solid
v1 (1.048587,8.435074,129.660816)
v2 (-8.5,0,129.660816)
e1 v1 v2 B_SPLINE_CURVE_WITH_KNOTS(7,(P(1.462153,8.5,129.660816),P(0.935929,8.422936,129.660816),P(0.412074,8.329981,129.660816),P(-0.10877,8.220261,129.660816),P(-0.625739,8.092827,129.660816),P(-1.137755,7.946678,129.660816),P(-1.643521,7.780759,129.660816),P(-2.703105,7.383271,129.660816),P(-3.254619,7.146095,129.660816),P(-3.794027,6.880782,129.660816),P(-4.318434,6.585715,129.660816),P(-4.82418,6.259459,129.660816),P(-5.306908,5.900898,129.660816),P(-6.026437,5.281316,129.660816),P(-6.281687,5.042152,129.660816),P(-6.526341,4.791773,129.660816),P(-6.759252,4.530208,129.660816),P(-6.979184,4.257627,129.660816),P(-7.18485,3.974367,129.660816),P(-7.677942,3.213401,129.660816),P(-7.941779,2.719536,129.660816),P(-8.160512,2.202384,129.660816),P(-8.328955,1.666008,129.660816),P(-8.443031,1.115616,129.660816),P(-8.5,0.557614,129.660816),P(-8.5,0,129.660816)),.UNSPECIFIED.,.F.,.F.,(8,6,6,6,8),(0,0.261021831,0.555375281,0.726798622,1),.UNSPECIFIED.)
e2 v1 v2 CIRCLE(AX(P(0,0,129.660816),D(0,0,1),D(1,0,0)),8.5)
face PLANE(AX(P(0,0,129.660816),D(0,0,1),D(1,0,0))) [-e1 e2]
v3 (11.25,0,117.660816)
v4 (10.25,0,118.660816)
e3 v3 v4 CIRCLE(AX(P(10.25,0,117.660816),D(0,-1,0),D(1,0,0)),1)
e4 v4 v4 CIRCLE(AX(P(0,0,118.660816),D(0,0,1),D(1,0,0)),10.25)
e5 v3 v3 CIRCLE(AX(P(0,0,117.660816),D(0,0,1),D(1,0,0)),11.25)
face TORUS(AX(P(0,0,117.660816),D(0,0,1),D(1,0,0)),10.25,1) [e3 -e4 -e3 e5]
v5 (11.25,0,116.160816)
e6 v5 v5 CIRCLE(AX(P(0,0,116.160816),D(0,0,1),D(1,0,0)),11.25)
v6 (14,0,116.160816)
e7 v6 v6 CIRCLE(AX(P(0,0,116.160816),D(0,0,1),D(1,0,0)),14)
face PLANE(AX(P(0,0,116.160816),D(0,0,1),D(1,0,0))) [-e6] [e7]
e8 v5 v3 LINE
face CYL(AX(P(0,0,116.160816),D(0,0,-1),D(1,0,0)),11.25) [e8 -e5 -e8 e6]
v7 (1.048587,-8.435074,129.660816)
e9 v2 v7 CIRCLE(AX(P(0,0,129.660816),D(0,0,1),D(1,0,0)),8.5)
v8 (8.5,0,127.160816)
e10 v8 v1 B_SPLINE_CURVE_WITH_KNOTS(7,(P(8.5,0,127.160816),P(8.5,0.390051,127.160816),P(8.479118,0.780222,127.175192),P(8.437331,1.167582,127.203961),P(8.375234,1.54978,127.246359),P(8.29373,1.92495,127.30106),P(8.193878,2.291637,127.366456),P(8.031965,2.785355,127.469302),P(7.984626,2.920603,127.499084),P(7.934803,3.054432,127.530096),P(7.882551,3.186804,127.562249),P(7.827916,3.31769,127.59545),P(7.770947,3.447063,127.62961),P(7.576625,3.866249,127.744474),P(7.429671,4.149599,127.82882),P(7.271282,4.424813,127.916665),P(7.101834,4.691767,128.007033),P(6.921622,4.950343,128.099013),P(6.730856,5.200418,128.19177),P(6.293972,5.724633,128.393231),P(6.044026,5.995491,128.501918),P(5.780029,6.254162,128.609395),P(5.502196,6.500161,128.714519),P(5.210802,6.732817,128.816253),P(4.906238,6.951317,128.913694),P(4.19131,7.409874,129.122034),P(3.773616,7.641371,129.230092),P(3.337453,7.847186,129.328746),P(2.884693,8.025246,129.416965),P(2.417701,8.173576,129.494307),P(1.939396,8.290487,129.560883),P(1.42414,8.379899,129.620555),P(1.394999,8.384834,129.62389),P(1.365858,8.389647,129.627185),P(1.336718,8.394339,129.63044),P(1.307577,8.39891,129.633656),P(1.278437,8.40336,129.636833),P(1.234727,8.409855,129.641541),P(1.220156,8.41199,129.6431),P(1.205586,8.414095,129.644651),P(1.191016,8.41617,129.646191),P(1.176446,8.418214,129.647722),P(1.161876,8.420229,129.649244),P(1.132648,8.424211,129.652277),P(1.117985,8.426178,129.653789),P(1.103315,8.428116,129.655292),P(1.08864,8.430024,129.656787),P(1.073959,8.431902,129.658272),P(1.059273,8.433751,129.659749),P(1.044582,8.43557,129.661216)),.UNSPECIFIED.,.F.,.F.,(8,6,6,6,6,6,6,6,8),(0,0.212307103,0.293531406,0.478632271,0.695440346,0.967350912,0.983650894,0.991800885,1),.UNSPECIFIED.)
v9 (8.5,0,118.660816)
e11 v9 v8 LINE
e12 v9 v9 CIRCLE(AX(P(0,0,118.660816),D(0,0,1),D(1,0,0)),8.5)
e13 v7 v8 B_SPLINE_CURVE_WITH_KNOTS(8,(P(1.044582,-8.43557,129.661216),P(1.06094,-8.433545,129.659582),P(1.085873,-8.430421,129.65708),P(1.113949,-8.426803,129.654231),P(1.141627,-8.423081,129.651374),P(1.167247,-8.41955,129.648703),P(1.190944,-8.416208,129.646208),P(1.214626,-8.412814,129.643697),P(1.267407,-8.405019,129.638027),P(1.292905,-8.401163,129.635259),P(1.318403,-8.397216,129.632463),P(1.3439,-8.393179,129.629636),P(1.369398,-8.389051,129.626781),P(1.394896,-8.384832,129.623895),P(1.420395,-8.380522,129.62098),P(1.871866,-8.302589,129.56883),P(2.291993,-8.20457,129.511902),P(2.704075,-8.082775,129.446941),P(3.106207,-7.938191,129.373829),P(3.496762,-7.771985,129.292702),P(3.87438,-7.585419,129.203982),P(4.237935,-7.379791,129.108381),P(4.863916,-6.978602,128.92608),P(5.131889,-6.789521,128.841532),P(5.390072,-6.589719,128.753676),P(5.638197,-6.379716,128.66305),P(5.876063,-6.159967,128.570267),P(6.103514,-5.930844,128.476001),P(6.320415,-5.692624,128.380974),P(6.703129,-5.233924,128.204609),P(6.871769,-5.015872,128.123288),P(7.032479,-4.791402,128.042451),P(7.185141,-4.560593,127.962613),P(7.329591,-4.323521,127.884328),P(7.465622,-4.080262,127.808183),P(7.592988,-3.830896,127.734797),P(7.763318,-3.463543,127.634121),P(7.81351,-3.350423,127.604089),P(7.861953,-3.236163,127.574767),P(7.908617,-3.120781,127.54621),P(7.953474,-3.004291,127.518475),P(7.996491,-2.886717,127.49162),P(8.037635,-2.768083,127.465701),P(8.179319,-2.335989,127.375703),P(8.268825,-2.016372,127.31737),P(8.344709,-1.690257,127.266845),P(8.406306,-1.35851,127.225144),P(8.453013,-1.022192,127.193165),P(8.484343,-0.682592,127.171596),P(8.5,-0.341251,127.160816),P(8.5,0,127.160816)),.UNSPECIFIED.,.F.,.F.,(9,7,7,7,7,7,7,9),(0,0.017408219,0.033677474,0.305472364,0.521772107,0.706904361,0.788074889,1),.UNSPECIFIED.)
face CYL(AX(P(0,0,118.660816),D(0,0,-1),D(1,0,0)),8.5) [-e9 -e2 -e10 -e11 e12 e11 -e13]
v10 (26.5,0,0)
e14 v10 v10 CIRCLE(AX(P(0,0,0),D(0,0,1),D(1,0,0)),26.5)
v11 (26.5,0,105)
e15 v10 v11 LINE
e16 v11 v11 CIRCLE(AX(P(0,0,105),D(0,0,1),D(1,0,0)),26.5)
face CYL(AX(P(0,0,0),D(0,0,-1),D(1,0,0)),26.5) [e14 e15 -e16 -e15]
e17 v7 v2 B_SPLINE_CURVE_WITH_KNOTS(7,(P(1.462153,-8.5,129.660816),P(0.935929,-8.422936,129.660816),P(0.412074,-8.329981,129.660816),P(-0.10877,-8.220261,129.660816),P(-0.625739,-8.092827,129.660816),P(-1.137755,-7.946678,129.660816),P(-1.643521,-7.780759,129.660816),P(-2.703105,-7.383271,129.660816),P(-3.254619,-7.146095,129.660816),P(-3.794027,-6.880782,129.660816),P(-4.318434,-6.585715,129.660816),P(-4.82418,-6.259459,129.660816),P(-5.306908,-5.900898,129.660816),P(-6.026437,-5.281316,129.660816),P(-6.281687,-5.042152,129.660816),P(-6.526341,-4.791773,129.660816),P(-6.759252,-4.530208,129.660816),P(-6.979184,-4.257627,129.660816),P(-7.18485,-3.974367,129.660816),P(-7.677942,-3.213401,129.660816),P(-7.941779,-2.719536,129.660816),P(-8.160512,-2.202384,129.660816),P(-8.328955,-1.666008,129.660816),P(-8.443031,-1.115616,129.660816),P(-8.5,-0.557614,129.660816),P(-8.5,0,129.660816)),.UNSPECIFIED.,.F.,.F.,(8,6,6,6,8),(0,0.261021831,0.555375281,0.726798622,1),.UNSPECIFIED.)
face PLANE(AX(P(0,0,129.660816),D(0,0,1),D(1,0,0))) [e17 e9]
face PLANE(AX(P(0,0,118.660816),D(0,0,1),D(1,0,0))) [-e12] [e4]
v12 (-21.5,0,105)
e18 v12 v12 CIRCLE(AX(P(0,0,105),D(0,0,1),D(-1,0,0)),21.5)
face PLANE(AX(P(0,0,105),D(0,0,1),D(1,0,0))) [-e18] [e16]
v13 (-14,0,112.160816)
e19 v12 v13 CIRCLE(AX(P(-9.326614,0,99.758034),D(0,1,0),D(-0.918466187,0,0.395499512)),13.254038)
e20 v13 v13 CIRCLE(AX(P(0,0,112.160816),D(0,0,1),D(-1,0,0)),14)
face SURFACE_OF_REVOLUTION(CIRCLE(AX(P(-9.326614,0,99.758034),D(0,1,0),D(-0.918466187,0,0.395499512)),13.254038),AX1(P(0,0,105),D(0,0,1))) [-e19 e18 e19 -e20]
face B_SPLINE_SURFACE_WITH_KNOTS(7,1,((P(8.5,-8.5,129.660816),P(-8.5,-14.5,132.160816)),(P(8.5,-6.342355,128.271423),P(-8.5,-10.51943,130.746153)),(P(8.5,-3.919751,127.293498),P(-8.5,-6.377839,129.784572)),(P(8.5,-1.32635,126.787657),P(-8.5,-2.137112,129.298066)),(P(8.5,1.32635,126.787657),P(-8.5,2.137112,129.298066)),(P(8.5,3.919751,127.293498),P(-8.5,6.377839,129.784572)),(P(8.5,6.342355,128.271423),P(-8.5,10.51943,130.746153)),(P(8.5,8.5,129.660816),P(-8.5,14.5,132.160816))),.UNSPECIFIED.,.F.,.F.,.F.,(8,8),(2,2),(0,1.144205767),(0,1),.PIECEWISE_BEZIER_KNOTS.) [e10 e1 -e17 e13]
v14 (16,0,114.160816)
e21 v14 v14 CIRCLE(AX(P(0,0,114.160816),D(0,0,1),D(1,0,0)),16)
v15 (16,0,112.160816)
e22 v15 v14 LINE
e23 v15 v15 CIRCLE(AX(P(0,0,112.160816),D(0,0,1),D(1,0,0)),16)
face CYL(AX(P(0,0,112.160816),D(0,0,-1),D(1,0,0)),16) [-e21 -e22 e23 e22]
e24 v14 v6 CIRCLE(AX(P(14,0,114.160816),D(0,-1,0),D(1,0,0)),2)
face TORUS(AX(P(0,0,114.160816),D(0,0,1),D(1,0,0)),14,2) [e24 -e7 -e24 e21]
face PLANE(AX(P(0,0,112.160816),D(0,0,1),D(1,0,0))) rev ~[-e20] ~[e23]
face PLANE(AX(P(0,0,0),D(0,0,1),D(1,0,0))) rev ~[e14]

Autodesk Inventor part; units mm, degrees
ref_plane "XZ Plane" through (0, 0, 0) normal (0, 1, 0) x (-1, 0, 0)
sketch "Sketch1" plane through (0, 0, 0) normal (0, 0, 1) x (1, 0, 0)
  circle A0 centre (0, 0) radius 26.5
  dimension "d0" = 53
extrude "Extrusion1" add sketch "Sketch1" along normal blind 105
sketch "Sketch2" plane through (0, 0, 0) normal (0, 1, 0) x (-1, 0, 0)
  line L0 (6.5, 97) -> (21.5, 97)
  line L1 (21.5, 97) -> (21.5, 105)
  line L2 (14, 112.160816) -> (6.5, 112.160816)
  line L3 (6.5, 105) -> (6.5, 97)
  line L4 (26.5, 0) -> (26.5, 105) construction
  line L5 (0, -19.756358) -> (0, 218.345658) construction
  line L6 (21.5, 105) -> (0, 105)
  line L7 (0, 105) -> (0, 112.160816)
  line L8 (0, 112.160816) -> (14, 112.160816)
  line L9 (14, 122.762224) -> (14, 96.929674) construction
  arc A0 (21.5, 105) -> (14, 112.160816) centre (9.326615, 99.758035) ccw construction
  arc A1 (21.5, 105) -> (14, 112.160816) centre (9.326615, 99.758035) ccw
  line L10 (0, -67.376762) -> (0, 265.966062)
  point P0 (0, 0)
  dimension "d4" = 8
  dimension "d5" = 5
revolve "Revolution1" add sketch "Sketch2" angle 360 about axis through (0, 0, -10) along (0, 0, 1) contours L6 L7 L8 L2 A1
sketch "Sketch3" plane through (0, 0, 112.160816) normal (0, 0, 1) x (1, 0, 0)
  circle A0 centre (0, 0) radius 14 projected
  circle A1 centre (0, 0) radius 16
  dimension "d8" = 32
extrude "Extrusion2" add sketch "Sketch3" along normal blind 4 contours A0 | A1
sketch "Sketch4" plane through (0, 0, 116.160816) normal (0, 0, 1) x (1, 0, 0)
  circle A0 centre (0, 0) radius 16 projected
  circle A1 centre (0, 0) radius 11.25
  dimension "d11" = 22.5
extrude "Extrusion3" add sketch "Sketch4" along normal blind 2.5 contours A1
sketch "Sketch5" plane through (0, 0, 118.660816) normal (0, 0, 1) x (1, 0, 0)
  circle A0 centre (0, 0) radius 11.25 projected
  circle A1 centre (0, 0) radius 8.5
  dimension "d14" = 17
extrude "Extrusion4" add sketch "Sketch5" along normal blind 11 contours A1
ref_plane "Work Plane1" through (8.5, 0, 0) normal (1, 0, 0) x (0, 1, 0)
sketch "Sketch6" plane through (8.5, 0, 0) normal (1, 0, 0) x (0, 1, 0)
  line L0 (8.5, 129.660816) -> (-8.5, 129.660816) construction
  line L1 (11.25, 118.660816) -> (-11.25, 118.660816) construction
  line L2 (-11.850613, 127.160816) -> (16.091514, 127.160816) construction
  line L3 (-8.5, 118.660816) -> (-8.5, 129.660816) construction
  line L4 (8.5, 118.660816) -> (8.5, 129.660816) construction
  arc A0 (-8.5, 129.660816) -> (8.5, 129.660816) centre (0, 142.860816) ccw
  line L5 (-8.5, 129.660816) -> (8.5, 129.660816)
  point P0 (0, 0)
  dimension "d18" = 8.5
ref_plane "Work Plane2" through (-8.5, 0, 0) normal (1, 0, 0) x (0, 1, 0)
sketch "Sketch7" plane through (-8.5, 0, 0) normal (1, 0, 0) x (0, 1, 0)
  line L0 (8.5, 118.660816) -> (8.5, 129.660816) construction
  line L1 (-8.5, 118.660816) -> (-8.5, 129.660816) construction
  line L2 (11.25, 118.660816) -> (-11.25, 118.660816) construction
  line L3 (10.28234, 132.160816) -> (-15.326143, 132.160816) construction
  line L4 (8.5, 128.85356) -> (8.5, 132.770152) construction
  line L5 (-8.5, 128.418383) -> (-8.5, 133.238804) construction
  line L6 (8.5, 132.160816) -> (-8.5, 132.160816)
  line L7 (14.5, 124.804712) -> (14.5, 141.766568) construction
  line L8 (-14.5, 142.728943) -> (-14.5, 126.729462) construction
  line L9 (18.190676, 132.160816) -> (-22.229061, 132.160816) construction
  arc A0 (-14.5, 132.160816) -> (14.5, 132.160816) centre (0, 172.960816) ccw
  line L10 (14.5, 132.160816) -> (-14.5, 132.160816)
  point P0 (0, 0)
  dimension "d22" = 6
  dimension "d23" = 6
sketch "Sketch6 outline for Loft1" plane through (8.5, 0, 0) normal (1, 0, 0) x (0, 1, 0)
  line L0 (8.5, 129.660816) -> (-8.5, 129.660816)
  arc A0 (-8.5, 129.660816) -> (8.5, 129.660816) centre (0, 142.860816) ccw
sketch "Sketch7 outline for Loft1" plane through (-8.5, 0, 0) normal (1, 0, 0) x (0, 1, 0)
  line L0 (14.5, 132.160816) -> (-14.5, 132.160816)
  arc A0 (-14.5, 132.160816) -> (14.5, 132.160816) centre (0, 172.960816) ccw
loft "Loft1" cut profiles "Sketch6 outline for Loft1", "Sketch7 outline for Loft1"
fillet "Fillet1" radius 2 1 edges at (-16, 0, 116.1608)
fillet "Fillet2" radius 1 1 edges at (-11.25, 0, 118.6608)
properties part number "SprayCan105mm"
